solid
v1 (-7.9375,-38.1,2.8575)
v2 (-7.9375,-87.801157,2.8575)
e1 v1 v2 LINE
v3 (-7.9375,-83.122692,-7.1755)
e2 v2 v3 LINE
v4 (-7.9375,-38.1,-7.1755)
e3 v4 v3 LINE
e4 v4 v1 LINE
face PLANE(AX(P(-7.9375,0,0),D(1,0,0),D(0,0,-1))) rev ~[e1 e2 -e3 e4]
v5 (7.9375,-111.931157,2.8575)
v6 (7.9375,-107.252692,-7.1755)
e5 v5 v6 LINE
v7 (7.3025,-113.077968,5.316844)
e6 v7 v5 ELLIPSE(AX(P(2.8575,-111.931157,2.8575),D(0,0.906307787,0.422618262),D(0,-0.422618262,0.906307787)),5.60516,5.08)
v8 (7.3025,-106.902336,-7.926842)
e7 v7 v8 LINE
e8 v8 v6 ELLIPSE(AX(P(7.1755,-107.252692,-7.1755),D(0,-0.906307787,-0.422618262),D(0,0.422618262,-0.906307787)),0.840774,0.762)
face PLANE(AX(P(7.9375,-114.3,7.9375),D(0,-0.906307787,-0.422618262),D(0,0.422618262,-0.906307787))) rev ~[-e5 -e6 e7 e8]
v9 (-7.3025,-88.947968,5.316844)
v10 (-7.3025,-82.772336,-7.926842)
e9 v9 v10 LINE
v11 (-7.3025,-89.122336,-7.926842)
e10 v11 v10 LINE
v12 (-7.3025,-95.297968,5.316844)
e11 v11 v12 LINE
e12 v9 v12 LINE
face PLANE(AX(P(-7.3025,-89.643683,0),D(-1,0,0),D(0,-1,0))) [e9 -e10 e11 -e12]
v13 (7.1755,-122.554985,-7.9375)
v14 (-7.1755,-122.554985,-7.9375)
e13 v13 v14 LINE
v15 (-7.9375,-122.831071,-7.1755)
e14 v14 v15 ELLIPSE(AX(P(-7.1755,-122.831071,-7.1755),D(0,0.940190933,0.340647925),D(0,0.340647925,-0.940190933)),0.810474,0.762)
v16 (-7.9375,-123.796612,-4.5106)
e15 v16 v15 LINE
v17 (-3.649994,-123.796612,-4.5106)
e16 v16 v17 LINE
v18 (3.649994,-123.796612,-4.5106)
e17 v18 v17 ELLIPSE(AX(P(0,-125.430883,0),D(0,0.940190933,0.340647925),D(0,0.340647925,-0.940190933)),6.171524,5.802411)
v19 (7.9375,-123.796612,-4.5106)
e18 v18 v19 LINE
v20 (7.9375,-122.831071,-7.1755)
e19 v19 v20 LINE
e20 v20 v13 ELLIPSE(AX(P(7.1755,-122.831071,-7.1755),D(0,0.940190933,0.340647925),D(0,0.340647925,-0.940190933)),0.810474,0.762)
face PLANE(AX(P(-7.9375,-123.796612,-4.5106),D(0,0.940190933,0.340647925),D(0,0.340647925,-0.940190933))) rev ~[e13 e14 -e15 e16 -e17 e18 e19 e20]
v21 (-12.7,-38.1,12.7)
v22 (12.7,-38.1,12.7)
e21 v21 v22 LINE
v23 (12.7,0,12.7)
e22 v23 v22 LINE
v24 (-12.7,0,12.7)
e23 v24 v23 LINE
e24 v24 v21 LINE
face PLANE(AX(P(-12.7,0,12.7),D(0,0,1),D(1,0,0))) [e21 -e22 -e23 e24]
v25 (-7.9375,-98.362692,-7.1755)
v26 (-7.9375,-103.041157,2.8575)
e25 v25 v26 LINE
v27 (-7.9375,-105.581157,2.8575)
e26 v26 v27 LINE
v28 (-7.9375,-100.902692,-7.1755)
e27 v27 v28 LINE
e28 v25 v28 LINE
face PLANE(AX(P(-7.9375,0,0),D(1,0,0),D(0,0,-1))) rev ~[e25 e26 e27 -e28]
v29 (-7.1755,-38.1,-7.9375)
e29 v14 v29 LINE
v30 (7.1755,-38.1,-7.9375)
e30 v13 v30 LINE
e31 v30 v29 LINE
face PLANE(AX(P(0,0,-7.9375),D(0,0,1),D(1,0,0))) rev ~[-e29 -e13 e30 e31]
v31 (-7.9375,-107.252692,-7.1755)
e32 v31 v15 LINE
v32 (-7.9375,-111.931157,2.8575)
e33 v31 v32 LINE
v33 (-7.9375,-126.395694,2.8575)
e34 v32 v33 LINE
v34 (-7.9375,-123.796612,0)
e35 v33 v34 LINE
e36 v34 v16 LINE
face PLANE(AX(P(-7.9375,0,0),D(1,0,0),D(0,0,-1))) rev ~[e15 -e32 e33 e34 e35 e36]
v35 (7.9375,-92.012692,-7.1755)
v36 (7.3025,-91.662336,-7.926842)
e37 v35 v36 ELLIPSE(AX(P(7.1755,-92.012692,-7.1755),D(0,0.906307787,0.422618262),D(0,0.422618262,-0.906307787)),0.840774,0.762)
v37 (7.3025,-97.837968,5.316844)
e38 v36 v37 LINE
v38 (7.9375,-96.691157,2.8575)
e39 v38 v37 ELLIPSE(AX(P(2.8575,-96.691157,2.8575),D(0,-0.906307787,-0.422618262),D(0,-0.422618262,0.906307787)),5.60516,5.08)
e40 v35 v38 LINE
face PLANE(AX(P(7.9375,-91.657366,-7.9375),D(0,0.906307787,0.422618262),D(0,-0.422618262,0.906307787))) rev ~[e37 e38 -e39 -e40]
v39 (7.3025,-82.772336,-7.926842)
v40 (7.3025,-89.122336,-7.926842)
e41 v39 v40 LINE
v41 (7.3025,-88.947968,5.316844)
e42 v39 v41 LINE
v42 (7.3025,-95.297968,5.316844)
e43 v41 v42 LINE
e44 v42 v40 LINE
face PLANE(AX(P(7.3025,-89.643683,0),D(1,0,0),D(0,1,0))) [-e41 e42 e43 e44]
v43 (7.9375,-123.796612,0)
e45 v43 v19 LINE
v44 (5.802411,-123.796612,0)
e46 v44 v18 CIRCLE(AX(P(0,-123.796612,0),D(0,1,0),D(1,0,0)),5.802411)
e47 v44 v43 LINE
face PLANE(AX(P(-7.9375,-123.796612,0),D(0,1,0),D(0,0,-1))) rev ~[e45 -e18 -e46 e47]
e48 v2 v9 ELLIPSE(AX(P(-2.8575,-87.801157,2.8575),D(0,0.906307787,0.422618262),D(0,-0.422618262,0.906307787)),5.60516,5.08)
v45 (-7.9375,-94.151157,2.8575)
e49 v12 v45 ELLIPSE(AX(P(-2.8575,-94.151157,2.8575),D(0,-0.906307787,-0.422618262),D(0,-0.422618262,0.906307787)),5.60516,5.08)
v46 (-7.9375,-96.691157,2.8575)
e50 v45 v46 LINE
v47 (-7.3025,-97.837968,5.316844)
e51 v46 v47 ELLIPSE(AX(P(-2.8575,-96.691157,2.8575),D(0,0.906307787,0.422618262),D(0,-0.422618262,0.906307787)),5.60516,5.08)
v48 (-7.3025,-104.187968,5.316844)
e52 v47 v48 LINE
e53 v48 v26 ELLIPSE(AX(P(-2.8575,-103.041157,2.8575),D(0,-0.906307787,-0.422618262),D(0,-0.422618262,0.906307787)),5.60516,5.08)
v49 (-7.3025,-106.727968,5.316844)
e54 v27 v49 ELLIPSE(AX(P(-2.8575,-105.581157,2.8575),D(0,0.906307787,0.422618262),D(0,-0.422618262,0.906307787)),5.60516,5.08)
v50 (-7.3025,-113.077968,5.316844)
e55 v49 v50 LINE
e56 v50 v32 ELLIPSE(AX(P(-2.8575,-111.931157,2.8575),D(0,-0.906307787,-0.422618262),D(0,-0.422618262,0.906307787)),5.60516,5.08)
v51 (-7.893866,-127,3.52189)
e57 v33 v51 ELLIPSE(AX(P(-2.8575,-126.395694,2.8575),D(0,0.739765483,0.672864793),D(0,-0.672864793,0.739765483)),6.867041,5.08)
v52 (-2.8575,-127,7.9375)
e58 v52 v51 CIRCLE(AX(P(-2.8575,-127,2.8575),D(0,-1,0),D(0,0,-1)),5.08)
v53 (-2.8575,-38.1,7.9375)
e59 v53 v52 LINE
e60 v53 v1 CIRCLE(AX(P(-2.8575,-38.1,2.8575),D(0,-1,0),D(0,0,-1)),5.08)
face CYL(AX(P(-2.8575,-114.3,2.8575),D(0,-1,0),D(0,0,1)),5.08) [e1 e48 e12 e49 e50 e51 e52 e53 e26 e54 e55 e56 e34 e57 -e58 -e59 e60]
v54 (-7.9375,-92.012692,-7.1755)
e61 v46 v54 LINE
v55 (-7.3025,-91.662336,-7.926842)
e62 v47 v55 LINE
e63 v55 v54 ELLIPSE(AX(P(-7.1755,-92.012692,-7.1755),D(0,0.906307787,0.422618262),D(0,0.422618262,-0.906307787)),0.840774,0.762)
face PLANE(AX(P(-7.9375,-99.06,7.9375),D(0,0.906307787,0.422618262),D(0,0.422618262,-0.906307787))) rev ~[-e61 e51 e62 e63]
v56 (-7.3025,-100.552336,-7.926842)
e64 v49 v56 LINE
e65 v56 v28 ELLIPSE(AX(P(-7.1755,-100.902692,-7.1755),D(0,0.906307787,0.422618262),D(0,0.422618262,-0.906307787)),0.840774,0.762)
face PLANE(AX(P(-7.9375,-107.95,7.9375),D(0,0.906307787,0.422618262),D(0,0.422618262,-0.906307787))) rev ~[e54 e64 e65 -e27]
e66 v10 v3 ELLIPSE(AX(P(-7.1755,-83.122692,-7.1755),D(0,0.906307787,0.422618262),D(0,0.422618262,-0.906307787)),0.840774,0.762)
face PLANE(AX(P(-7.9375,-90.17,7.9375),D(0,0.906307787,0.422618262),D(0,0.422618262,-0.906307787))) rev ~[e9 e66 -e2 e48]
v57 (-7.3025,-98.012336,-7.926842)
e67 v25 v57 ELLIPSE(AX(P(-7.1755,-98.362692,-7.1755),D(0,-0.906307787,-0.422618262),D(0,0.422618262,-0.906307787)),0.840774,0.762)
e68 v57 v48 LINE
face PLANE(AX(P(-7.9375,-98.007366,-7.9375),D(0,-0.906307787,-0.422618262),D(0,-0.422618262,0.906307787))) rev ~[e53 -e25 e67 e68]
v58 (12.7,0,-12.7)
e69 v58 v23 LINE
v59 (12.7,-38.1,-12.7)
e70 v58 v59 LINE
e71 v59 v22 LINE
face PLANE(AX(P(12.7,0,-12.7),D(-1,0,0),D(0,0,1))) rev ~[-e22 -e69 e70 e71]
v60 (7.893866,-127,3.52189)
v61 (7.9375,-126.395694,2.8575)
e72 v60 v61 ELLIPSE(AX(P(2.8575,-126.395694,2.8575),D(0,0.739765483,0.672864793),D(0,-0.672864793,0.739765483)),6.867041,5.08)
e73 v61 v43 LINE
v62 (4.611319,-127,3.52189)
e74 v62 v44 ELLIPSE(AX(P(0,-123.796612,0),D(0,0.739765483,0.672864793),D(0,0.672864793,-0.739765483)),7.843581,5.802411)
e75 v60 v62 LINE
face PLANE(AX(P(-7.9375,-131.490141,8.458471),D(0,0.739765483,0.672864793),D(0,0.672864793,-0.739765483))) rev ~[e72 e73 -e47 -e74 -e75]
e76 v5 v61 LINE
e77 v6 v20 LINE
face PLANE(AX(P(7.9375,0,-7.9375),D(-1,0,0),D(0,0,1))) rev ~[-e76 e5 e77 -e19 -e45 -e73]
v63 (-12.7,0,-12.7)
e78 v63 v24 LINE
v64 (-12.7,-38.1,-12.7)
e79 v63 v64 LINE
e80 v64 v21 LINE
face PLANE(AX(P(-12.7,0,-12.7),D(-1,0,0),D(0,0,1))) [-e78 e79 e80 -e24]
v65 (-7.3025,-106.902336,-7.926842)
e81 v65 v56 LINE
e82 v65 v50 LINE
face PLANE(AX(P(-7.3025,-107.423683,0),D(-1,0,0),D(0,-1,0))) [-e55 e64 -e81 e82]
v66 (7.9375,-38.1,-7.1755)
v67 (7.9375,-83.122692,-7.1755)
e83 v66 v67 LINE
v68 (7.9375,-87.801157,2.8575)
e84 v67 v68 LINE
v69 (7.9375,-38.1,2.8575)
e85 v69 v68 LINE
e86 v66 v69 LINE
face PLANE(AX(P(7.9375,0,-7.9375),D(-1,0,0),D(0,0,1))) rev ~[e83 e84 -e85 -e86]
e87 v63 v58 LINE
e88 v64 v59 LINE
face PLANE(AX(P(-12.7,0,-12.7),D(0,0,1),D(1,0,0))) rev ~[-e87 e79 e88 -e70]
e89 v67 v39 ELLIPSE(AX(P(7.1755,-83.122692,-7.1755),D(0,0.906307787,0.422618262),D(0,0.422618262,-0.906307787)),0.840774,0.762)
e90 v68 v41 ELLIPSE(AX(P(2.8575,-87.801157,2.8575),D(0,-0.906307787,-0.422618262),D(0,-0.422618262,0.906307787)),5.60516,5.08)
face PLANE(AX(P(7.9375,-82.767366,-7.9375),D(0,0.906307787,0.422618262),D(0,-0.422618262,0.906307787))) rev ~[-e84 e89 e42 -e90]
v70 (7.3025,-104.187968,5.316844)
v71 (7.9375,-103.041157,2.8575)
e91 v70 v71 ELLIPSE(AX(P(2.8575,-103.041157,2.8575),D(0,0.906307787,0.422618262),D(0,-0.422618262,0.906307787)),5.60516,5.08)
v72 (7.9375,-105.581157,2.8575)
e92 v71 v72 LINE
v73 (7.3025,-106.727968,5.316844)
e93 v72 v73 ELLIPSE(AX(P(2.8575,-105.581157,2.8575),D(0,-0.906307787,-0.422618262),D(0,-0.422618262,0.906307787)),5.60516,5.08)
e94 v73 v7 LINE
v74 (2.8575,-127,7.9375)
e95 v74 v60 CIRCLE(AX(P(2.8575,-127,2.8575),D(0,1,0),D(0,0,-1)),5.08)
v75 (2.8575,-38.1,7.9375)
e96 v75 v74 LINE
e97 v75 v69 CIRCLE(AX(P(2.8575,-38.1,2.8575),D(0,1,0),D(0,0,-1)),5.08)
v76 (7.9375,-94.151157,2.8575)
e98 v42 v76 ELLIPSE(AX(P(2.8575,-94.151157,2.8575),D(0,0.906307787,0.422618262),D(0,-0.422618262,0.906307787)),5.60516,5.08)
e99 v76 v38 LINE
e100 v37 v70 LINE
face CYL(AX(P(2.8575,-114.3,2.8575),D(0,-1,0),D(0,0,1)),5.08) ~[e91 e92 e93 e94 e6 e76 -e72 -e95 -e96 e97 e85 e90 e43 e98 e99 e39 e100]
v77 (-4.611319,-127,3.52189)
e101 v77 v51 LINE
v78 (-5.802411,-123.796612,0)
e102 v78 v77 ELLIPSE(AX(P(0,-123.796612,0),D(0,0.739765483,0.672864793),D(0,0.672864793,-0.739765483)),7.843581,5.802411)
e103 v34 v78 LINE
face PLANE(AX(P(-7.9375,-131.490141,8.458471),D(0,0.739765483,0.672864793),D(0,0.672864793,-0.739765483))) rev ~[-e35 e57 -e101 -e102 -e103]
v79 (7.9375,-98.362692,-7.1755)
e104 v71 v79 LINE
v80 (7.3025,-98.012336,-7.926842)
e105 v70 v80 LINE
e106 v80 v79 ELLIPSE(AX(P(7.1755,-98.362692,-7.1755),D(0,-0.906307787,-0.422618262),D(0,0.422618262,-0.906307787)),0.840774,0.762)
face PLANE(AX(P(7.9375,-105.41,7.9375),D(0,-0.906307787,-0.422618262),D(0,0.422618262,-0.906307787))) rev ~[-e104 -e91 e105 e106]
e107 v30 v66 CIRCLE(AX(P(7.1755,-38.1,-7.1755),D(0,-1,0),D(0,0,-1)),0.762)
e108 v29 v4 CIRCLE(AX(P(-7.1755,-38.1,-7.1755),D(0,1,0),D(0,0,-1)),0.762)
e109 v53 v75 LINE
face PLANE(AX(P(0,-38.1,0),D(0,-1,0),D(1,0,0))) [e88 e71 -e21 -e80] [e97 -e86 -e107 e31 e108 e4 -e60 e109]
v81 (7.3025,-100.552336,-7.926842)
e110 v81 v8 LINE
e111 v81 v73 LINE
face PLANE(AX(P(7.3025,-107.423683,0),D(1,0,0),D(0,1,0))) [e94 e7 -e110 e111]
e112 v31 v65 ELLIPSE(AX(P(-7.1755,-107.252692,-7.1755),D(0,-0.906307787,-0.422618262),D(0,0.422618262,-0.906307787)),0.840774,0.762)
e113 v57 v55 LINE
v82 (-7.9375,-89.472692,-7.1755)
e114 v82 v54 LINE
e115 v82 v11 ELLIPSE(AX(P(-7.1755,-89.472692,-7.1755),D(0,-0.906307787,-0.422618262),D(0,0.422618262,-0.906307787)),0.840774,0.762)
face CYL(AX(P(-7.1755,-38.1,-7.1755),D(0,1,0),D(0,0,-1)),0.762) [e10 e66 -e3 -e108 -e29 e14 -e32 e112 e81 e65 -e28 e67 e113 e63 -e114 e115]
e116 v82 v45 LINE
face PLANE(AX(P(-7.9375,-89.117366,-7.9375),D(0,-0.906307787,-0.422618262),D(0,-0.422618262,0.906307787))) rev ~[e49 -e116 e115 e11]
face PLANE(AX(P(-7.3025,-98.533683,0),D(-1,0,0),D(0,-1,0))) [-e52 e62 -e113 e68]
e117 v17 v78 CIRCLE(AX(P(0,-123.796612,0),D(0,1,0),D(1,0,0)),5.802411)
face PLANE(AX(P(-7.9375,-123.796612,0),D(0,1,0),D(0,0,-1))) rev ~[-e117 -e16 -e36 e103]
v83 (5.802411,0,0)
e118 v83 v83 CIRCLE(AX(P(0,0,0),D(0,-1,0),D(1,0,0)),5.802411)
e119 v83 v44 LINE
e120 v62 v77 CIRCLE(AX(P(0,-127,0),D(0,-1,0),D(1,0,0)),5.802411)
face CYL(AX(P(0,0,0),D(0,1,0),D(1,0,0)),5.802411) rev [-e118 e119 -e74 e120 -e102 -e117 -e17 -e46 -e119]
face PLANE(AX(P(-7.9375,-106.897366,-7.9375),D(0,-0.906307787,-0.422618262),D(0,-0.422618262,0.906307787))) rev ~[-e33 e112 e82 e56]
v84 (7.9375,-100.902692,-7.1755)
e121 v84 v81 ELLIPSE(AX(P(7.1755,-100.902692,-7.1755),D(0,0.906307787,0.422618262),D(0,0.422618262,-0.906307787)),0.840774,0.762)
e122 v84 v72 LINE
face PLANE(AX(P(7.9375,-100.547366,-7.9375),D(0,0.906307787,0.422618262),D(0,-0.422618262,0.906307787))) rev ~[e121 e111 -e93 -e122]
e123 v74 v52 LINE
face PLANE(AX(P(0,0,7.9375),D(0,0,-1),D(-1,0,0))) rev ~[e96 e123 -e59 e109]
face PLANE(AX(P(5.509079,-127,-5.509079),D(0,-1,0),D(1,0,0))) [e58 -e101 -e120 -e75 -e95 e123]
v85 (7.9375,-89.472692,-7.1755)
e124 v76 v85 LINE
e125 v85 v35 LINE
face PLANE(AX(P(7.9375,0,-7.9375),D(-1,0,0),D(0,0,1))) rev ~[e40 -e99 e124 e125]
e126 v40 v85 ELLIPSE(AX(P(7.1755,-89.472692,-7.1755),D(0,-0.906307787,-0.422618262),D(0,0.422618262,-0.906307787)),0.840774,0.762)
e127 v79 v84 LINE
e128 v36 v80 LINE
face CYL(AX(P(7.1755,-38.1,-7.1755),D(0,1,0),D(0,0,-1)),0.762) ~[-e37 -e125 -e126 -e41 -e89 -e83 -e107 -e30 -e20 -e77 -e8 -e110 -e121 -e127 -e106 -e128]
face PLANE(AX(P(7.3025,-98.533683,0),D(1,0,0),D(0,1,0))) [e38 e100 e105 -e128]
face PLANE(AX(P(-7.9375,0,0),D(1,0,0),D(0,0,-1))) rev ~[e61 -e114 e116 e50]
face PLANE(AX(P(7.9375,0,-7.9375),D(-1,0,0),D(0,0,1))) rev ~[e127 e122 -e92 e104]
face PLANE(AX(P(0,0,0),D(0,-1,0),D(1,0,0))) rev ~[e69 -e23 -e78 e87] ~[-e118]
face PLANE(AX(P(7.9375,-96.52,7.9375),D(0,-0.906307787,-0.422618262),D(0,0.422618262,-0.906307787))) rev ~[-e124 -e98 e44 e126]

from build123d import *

# Parameters (mm, degrees)
F0_W        = 25.4
F0_H        = 25.4
F1_DEPTH    = 38.1
F0_R        = 5.8024107256
F2_DEPTH    = 127
F3_DEPTH    = 127
F5_DEPTH    = 0.635
F7_DEPTH    = 0.635
F8_F1_R     = 5.08
F8_F2_R     = 5.08
F9_T1_DEPTH = 29.2466340732
F9_T3_DEPTH = 49.2393659268
F9_T5_DEPTH = 11.684
F9_T7_DEPTH = 11.684
F11_DEPTH   = 25.4
F13_DEPTH   = 25.4


# Not quite as in the source:
# - a fillet or chamfer that OpenCascade refuses, or shapes differently, is made with other operations: its cross-section is extruded or revolved along the edge and cut away or added


with BuildPart() as f1:
    # F0 (on Front) → F1 (new body)
    with BuildSketch(Plane.XZ):
        Rectangle(F0_W, F0_H)
        Polygon((7.9375, 7.9375), (7.9375, 0), (7.9375, -7.9375), (0, -7.9375), (-7.9375, -7.9375), (-7.9375, 0), (-7.9375, 7.9375), (0, 7.9375), align=None, mode=Mode.SUBTRACT)
    extrude(amount=F1_DEPTH)



with BuildPart() as f1b:
    # F0 (on Front) → F1, piece 2 (new body)
    with BuildSketch(Plane.XZ):
        with BuildLine():
            ThreePointArc((0, -7.9375), (5.6126600757, -5.6126600757), (7.9375, 0))
            ThreePointArc((7.9375, 0), (5.6126600757, 5.6126600757), (0, 7.9375))
            ThreePointArc((0, 7.9375), (-5.6126600757, 5.6126600757), (-7.9375, 0))
            ThreePointArc((-7.9375, 0), (-5.6126600757, -5.6126600757), (0, -7.9375))
        make_face()
        Circle(F0_R, mode=Mode.SUBTRACT)
    extrude(amount=F1_DEPTH)


with BuildPart() as f1_1:
    add(f1.part)

    add(f1b.part)  # F2 merges F1b
    # F0 (on Front) → F2 (join)
    with BuildSketch(Plane.XZ):
        with BuildLine():
            ThreePointArc((0, -7.9375), (5.6126600757, -5.6126600757), (7.9375, 0))
            ThreePointArc((7.9375, 0), (5.6126600757, 5.6126600757), (0, 7.9375))
            ThreePointArc((0, 7.9375), (-5.6126600757, 5.6126600757), (-7.9375, 0))
            ThreePointArc((-7.9375, 0), (-5.6126600757, -5.6126600757), (0, -7.9375))
        make_face()
        Circle(F0_R, mode=Mode.SUBTRACT)
    extrude(amount=F2_DEPTH)

    # F0 (on Front) → F3 (join)
    with BuildSketch(Plane.XZ):
        with BuildLine():
            Line((7.9375, -7.9375), (7.9375, 0))
            ThreePointArc((7.9375, 0), (5.6126600757, -5.6126600757), (0, -7.9375))
            Line((0, -7.9375), (7.9375, -7.9375))
        make_face()
        with BuildLine():
            ThreePointArc((0, 7.9375), (5.6126600757, 5.6126600757), (7.9375, 0))
            Line((7.9375, 0), (7.9375, 7.9375))
            Line((7.9375, 7.9375), (0, 7.9375))
        make_face()
        with BuildLine():
            ThreePointArc((-7.9375, 0), (-5.6126600757, 5.6126600757), (0, 7.9375))
            Line((0, 7.9375), (-7.9375, 7.9375))
            Line((-7.9375, 7.9375), (-7.9375, 0))
        make_face()
        with BuildLine():
            Line((-7.9375, -7.9375), (0, -7.9375))
            ThreePointArc((0, -7.9375), (-5.6126600757, -5.6126600757), (-7.9375, 0))
            Line((-7.9375, 0), (-7.9375, -7.9375))
        make_face()
    extrude(amount=F3_DEPTH)

    # F4 (on face) → F5 (cut)
    with BuildSketch(Plane(origin=(-7.9375, 0, 0), x_dir=(0, -1, 0), z_dir=(-1, 0, 0))):
        Polygon((106.8973659268, -7.9375), (114.3, 7.9375), (107.95, 7.9375), (100.5473659268, -7.9375), align=None)
        Polygon((98.0073659268, -7.9375002533), (105.41, 7.9374997467), (99.06, 7.9374997467), (91.6573659268, -7.9375002533), align=None)
        Polygon((89.1173659268, -7.9375002533), (96.52, 7.9374997467), (90.17, 7.9374997467), (82.7673659268, -7.9375002533), align=None)
    extrude(amount=-F5_DEPTH, mode=Mode.SUBTRACT)

    # F6 (on face) → F7 (cut)
    with BuildSketch(Plane.YZ.offset(7.9375)):
        Polygon((-107.95, 7.9375), (-114.3, 7.9375), (-106.8973659268, -7.9375), (-100.5473659268, -7.9375), align=None)
        Polygon((-99.06, 7.9374997467), (-105.41, 7.9374997467), (-98.0073659268, -7.9375002533), (-91.6573659268, -7.9375002533), align=None)
        Polygon((-90.17, 7.9374997467), (-96.52, 7.9374997467), (-89.1173659268, -7.9375002533), (-82.7673659268, -7.9375002533), align=None)
    extrude(amount=-F7_DEPTH, mode=Mode.SUBTRACT)

    # F8: fillet of radius 5.08 on 8 edges, made by hand

    # F8_f1
    f8_f1_edges = [f1_1.edges().sort_by_distance(p)[0] for p in [
        (-7.9375, -120.65, 7.9375),
    ]]
    fillet(f8_f1_edges, radius=F8_F1_R)

    # F8_f2
    f8_f2_edges = [f1_1.edges().sort_by_distance(p)[0] for p in [
        (7.9375, -120.65, 7.9375),
    ]]
    fillet(f8_f2_edges, radius=F8_F2_R)

    # F9: fillet of radius 0.762 on 8 edges, made by hand

    # F9_s2 → F9_t1 (cut)
    with BuildSketch(Plane.XZ.offset(102.3253659268)):
        with BuildLine():
            ThreePointArc((-7.9375, -7.1755), (-7.7143153673, -7.7143153673), (-7.1755, -7.9375))
            Line((-7.1755, -7.9375), (-7.1755, -7.95274))
            Line((-7.1755, -7.95274), (-7.95274, -7.95274))
            Line((-7.95274, -7.95274), (-7.95274, -7.1755))
            Line((-7.95274, -7.1755), (-7.9375, -7.1755))
        make_face()
        with BuildLine():
            ThreePointArc((7.9375, -7.1755), (7.7143153673, -7.7143153673), (7.1755, -7.9375))
            Line((7.1755, -7.9375), (7.1755, -7.95274))
            Line((7.1755, -7.95274), (7.95274, -7.95274))
            Line((7.95274, -7.95274), (7.95274, -7.1755))
            Line((7.95274, -7.1755), (7.9375, -7.1755))
        make_face()
    extrude(amount=F9_T1_DEPTH, mode=Mode.SUBTRACT)

    # F9_s4 → F9_t3 (cut)
    with BuildSketch(Plane.XZ.offset(38.1)):
        with BuildLine():
            ThreePointArc((7.1755, -7.9375), (7.7143153673, -7.7143153673), (7.9375, -7.1755))
            Line((7.9375, -7.1755), (7.95274, -7.1755))
            Line((7.95274, -7.1755), (7.95274, -7.95274))
            Line((7.95274, -7.95274), (7.1755, -7.95274))
            Line((7.1755, -7.95274), (7.1755, -7.9375))
        make_face()
        with BuildLine():
            ThreePointArc((-7.1755, -7.9375), (-7.7143153673, -7.7143153673), (-7.9375, -7.1755))
            Line((-7.9375, -7.1755), (-7.95274, -7.1755))
            Line((-7.95274, -7.1755), (-7.95274, -7.95274))
            Line((-7.95274, -7.95274), (-7.1755, -7.95274))
            Line((-7.1755, -7.95274), (-7.1755, -7.9375))
        make_face()
    extrude(amount=F9_T3_DEPTH, mode=Mode.SUBTRACT)

    # F9_s6 → F9_t5 (cut)
    with BuildSketch(Plane.XZ.offset(84.5453659268)):
        with BuildLine():
            ThreePointArc((7.1755, -7.9375), (7.7143153673, -7.7143153673), (7.9375, -7.1755))
            Line((7.9375, -7.1755), (7.95274, -7.1755))
            Line((7.95274, -7.1755), (7.95274, -7.95274))
            Line((7.95274, -7.95274), (7.1755, -7.95274))
            Line((7.1755, -7.95274), (7.1755, -7.9375))
        make_face()
        with BuildLine():
            ThreePointArc((-7.1755, -7.9375), (-7.7143153673, -7.7143153673), (-7.9375, -7.1755))
            Line((-7.9375, -7.1755), (-7.95274, -7.1755))
            Line((-7.95274, -7.1755), (-7.95274, -7.95274))
            Line((-7.95274, -7.95274), (-7.1755, -7.95274))
            Line((-7.1755, -7.95274), (-7.1755, -7.9375))
        make_face()
    extrude(amount=F9_T5_DEPTH, mode=Mode.SUBTRACT)

    # F9_s8 → F9_t7 (cut)
    with BuildSketch(Plane.XZ.offset(93.4353659268)):
        with BuildLine():
            ThreePointArc((7.1755, -7.9375), (7.7143153673, -7.7143153673), (7.9375, -7.1755))
            Line((7.9375, -7.1755), (7.95274, -7.1755))
            Line((7.95274, -7.1755), (7.95274, -7.95274))
            Line((7.95274, -7.95274), (7.1755, -7.95274))
            Line((7.1755, -7.95274), (7.1755, -7.9375))
        make_face()
        with BuildLine():
            ThreePointArc((-7.1755, -7.9375), (-7.7143153673, -7.7143153673), (-7.9375, -7.1755))
            Line((-7.9375, -7.1755), (-7.95274, -7.1755))
            Line((-7.95274, -7.1755), (-7.95274, -7.95274))
            Line((-7.95274, -7.95274), (-7.1755, -7.95274))
            Line((-7.1755, -7.95274), (-7.1755, -7.9375))
        make_face()
    extrude(amount=F9_T7_DEPTH, mode=Mode.SUBTRACT)

    # F10 (on face) → F11 (cut)
    with BuildSketch(Plane(origin=(-7.9375, 0, 0), x_dir=(0, -1, 0), z_dir=(-1, 0, 0))):
        Polygon((139.3916606903, 2.8575), (129.1201191025, 15.1211110401), (129.6502673187, -9.5306912246), align=None)
    extrude(amount=-F11_DEPTH, mode=Mode.SUBTRACT)

    # F12 (on face) → F13 (cut)
    with BuildSketch(Plane(origin=(-7.9375, 0, 0), x_dir=(0, -1, 0), z_dir=(-1, 0, 0))):
        Polygon((131.4901411533, -9.1816671193), (131.4901411533, 8.4584709257), (123.7966120243, 0), (123.7966120243, -4.5106001198), (121.0489347577, -12.0942108333), align=None)
    extrude(amount=-F13_DEPTH, mode=Mode.SUBTRACT)


solid = f1_1.part
